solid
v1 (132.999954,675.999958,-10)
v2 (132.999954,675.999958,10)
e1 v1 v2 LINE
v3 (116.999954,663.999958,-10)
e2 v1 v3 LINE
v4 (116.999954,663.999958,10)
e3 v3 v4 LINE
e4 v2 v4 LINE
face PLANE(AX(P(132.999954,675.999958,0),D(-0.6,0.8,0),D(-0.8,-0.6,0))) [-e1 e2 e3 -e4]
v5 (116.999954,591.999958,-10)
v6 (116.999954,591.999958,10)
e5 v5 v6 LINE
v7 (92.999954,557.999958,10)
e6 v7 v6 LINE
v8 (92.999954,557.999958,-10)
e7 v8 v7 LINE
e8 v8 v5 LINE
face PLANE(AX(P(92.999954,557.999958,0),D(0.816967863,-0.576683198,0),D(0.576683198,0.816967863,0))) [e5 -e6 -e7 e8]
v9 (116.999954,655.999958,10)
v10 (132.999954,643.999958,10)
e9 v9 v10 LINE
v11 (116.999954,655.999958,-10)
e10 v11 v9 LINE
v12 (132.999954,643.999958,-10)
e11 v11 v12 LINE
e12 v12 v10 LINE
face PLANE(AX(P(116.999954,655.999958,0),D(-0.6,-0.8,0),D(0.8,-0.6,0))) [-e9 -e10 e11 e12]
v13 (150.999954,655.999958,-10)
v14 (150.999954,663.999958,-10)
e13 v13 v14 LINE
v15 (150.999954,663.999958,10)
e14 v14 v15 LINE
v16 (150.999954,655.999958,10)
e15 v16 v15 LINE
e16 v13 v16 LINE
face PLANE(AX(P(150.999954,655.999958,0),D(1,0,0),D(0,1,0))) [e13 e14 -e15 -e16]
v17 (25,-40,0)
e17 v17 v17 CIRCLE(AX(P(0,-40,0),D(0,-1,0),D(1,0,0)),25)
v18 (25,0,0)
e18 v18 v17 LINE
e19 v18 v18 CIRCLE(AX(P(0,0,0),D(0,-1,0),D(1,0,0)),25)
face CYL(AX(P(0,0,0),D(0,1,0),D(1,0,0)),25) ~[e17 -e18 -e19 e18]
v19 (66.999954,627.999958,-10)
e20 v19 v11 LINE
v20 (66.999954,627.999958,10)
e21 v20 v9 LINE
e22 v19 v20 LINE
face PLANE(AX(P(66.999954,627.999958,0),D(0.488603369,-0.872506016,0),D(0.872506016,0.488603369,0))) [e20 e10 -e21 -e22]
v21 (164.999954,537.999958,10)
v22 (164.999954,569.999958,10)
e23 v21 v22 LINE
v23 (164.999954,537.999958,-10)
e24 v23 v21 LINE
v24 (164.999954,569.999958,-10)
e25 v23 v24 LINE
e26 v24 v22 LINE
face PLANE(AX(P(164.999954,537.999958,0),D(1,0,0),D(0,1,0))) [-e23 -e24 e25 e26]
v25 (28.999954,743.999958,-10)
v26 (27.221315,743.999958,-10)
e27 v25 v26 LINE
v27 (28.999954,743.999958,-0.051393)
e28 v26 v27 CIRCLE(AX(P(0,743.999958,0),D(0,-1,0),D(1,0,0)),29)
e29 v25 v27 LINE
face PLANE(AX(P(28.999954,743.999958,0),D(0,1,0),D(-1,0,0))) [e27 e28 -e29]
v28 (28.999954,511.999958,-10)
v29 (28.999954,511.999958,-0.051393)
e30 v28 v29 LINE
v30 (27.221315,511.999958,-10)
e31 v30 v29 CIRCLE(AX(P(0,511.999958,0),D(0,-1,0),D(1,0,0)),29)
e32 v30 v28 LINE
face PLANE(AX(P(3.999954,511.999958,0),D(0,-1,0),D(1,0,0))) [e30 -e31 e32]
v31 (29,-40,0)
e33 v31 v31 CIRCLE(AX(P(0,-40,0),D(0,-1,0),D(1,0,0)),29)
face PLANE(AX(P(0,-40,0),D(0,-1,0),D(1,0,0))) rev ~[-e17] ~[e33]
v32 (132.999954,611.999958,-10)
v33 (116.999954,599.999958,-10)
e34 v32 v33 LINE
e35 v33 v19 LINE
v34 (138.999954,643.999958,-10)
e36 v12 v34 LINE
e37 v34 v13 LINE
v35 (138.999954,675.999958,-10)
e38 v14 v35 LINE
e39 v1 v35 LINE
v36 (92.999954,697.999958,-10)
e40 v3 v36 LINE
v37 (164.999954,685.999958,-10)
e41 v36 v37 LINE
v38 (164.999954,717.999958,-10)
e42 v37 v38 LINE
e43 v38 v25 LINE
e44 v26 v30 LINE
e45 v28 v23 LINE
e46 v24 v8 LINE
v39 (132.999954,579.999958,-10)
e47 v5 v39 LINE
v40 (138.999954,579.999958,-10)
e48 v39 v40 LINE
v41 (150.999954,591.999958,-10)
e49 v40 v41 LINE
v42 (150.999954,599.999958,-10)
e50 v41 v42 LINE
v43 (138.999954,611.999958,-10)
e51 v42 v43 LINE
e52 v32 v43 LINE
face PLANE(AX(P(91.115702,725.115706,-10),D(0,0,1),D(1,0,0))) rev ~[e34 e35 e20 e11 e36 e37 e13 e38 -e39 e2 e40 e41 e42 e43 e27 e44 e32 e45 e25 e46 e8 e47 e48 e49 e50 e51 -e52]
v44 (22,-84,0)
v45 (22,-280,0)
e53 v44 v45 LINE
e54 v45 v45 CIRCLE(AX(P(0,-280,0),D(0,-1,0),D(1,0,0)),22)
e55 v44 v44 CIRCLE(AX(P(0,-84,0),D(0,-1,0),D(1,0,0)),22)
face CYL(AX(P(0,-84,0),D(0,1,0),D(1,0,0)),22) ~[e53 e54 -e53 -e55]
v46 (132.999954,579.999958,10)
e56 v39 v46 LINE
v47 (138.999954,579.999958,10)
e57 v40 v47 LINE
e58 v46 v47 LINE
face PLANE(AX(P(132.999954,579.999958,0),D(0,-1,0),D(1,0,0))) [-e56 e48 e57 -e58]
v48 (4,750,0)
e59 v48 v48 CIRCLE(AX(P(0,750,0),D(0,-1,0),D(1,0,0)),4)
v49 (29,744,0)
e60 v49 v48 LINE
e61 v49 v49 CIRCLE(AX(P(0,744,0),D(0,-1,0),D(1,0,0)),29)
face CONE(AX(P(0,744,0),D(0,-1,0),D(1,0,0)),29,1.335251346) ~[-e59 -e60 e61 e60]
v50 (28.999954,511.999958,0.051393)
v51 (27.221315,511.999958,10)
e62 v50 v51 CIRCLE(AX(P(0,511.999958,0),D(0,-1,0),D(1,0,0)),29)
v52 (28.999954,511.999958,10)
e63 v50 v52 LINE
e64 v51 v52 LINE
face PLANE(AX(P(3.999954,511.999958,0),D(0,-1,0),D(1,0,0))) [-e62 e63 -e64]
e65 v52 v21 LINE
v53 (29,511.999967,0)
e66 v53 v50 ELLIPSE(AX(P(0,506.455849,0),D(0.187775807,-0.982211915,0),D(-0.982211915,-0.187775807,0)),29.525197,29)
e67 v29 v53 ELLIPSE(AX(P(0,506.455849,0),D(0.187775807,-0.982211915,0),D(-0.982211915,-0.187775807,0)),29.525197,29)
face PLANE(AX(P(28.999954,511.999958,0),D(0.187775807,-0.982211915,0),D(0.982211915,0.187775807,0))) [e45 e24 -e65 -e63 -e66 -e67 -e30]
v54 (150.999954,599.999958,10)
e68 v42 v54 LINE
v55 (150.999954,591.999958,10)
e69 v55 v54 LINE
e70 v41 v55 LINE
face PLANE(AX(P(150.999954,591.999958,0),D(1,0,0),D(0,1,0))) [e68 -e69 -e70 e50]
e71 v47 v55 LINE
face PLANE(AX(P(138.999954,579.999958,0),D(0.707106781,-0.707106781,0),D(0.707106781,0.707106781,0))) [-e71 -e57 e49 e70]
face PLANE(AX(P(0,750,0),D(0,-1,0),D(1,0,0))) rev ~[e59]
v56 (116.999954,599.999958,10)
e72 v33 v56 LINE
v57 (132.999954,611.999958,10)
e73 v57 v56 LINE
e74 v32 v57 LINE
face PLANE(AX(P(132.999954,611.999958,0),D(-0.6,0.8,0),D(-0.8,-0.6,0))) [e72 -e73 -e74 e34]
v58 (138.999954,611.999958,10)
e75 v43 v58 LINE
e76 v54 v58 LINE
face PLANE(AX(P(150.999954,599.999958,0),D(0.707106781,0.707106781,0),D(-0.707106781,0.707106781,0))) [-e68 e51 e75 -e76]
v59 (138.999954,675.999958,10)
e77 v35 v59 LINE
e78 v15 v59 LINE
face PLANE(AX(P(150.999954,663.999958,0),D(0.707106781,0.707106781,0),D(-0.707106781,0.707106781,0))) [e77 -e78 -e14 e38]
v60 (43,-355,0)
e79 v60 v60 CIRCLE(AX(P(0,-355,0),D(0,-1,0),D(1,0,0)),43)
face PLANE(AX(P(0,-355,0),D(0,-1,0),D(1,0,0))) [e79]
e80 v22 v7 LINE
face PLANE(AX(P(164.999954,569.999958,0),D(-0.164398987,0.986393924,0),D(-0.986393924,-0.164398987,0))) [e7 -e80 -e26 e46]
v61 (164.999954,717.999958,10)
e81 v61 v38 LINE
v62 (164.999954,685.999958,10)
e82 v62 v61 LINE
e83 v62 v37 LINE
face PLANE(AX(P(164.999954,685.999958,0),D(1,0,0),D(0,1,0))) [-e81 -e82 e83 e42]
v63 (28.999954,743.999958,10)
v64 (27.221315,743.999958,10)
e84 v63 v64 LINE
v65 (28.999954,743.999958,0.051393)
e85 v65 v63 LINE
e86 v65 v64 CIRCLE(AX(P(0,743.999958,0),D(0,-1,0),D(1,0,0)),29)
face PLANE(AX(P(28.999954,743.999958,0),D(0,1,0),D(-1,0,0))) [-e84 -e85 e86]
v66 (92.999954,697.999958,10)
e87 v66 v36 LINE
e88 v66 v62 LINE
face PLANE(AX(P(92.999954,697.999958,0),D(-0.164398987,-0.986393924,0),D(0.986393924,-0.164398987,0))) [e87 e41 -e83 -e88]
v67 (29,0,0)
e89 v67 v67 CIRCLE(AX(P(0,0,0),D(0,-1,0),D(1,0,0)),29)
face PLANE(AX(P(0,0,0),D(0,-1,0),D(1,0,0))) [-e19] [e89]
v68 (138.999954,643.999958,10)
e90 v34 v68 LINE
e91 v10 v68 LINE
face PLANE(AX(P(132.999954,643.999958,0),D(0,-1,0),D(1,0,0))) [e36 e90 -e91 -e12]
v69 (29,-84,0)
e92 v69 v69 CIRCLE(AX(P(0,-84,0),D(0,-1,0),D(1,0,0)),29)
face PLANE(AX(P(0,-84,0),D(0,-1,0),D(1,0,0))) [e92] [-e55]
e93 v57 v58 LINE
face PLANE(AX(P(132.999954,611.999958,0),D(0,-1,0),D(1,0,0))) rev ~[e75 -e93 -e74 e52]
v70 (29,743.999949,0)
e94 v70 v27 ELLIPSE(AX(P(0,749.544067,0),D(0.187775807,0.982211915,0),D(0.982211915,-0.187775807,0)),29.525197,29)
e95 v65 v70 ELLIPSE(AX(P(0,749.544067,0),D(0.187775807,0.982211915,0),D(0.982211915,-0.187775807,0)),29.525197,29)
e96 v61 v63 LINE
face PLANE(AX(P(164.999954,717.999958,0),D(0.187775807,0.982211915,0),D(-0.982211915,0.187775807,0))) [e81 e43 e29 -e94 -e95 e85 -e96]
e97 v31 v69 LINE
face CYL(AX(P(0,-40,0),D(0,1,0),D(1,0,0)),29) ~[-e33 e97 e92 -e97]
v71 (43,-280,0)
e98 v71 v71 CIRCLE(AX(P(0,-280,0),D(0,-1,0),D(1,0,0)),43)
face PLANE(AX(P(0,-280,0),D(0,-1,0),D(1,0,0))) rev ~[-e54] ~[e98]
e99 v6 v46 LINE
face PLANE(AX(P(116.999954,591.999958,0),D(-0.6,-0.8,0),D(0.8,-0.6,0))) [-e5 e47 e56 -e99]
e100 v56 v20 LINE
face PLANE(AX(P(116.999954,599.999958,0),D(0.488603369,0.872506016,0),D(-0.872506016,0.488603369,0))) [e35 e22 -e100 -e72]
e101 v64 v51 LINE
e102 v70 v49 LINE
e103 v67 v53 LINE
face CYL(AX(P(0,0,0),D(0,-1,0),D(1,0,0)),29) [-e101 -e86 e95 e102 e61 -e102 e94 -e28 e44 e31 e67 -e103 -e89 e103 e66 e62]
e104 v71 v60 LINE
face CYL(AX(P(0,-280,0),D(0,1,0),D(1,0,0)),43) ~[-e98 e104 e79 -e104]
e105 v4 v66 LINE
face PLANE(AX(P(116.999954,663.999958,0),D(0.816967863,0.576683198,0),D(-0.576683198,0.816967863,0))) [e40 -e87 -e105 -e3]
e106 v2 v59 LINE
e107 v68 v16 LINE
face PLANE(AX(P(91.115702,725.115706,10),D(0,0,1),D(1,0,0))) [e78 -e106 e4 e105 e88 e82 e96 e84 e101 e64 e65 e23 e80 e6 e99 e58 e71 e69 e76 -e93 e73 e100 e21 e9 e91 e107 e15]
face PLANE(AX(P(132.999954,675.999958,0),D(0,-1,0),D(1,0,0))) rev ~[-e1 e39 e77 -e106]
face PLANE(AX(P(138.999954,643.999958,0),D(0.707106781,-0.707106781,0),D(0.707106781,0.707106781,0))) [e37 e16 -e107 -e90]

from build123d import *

# Parameters (mm, degrees)
F0_R      = 29
F1_DEPTH  = 750
F2_R      = 25
F3_DEPTH  = 40
F4_R      = 29
F4_R_2    = 25
F5_DEPTH  = 44
F6_R      = 22
F7_DEPTH  = 196
F8_R      = 43
F8_R_2    = 22
F9_DEPTH  = 75
F10_SIZE2 = 25
F10_SIZE  = 6
F11_W     = 6
F11_H     = 12
F12_DEPTH = 10


# Not quite as in the source:
# - a feature names something its author has since deleted; it is built from what else it names


with BuildPart() as f1:
    # F0 (on Front) → F1 (new body)
    with BuildSketch(Plane.XZ):
        Circle(F0_R)
    extrude(amount=-F1_DEPTH)

    # F2 (on Front) → F3 (join)
    with BuildSketch(Plane.XZ):
        Circle(F2_R)
    extrude(amount=F3_DEPTH)

    # F4 (on face) → F5 (join)
    with BuildSketch(Plane.XZ.offset(40)):
        Circle(F4_R)
        Circle(F4_R_2, mode=Mode.SUBTRACT)
        Circle(F4_R_2)
    extrude(amount=F5_DEPTH)

    # F6 (on face) → F7 (join)
    with BuildSketch(Plane.XZ.offset(84)):
        Circle(F6_R)
    extrude(amount=F7_DEPTH)

    # F8 (on face) → F9 (join)
    with BuildSketch(Plane.XZ.offset(280)):
        Circle(F8_R)
        Circle(F8_R_2, mode=Mode.SUBTRACT)
        Circle(F8_R_2)
    extrude(amount=F9_DEPTH)

    # F10
    f10_edges = [f1.edges().sort_by_distance(p)[0] for p in [
        (-29, 750, 0),
    ]]
    f10_side = f1.faces().sort_by_distance((-29, 375, 0))[0]
    chamfer(f10_edges, length=F10_SIZE, length2=F10_SIZE2, reference=f10_side)

    # F11 (on Top) → F12 (join, symmetric)
    with BuildSketch(Plane.XY):
        Polygon((164.9999544621, 717.9999580383), (28.9999544621, 743.9999580383), (28.9999544621, 717.9999580383), align=None)
        Polygon((28.9999544621, 717.9999580383), (28.9999544621, 743.9999580383), (3.9999544621, 743.9999580383), (3.9999544621, 511.9999580383), (28.9999544621, 511.9999580383), (28.9999544621, 537.9999580383), align=None)
        Polygon((164.9999544621, 717.9999580383), (28.9999544621, 717.9999580383), (28.9999544621, 537.9999580383), (164.9999544621, 537.9999580383), (164.9999544621, 557.9999580383), (92.9999544621, 557.9999580383), (92.9999544621, 591.9999580383), (66.9999544621, 591.9999580383), (66.9999544621, 599.9999580383), (66.9999544621, 627.9999580383), (66.9999544621, 655.9999580383), (92.9999544621, 655.9999580383), (92.9999544621, 663.9999580383), (92.9999544621, 697.9999580383), (164.9999544621, 697.9999580383), align=None)
        Polygon((164.9999544621, 537.9999580383), (28.9999544621, 537.9999580383), (28.9999544621, 511.9999580383), align=None)
        Polygon((164.9999544621, 685.9999580383), (164.9999544621, 697.9999580383), (92.9999544621, 697.9999580383), align=None)
        Polygon((116.9999544621, 663.9999580383), (92.9999544621, 697.9999580383), (92.9999544621, 663.9999580383), align=None)
        Polygon((92.9999544621, 557.9999580383), (164.9999544621, 557.9999580383), (164.9999544621, 569.9999580383), align=None)
        Polygon((116.9999544621, 663.9999580383), (92.9999544621, 663.9999580383), (92.9999544621, 655.9999580383), (116.9999544621, 655.9999580383), (132.9999544621, 655.9999580383), (138.9999544621, 655.9999580383), (150.9999544621, 655.9999580383), (150.9999544621, 663.9999580383), (138.9999544621, 663.9999580383), (132.9999544621, 663.9999580383), align=None)
        Polygon((132.9999544621, 675.9999580383), (116.9999544621, 663.9999580383), (132.9999544621, 663.9999580383), align=None)
        Polygon((92.9999544621, 591.9999580383), (92.9999544621, 557.9999580383), (116.9999544621, 591.9999580383), align=None)
        Polygon((116.9999544621, 655.9999580383), (92.9999544621, 655.9999580383), (66.9999544621, 655.9999580383), (66.9999544621, 627.9999580383), align=None)
        with Locations((135.9999544621, 669.9999580383)):
            Rectangle(F11_W, F11_H)
        Polygon((66.9999544621, 591.9999580383), (92.9999544621, 591.9999580383), (116.9999544621, 591.9999580383), (132.9999544621, 591.9999580383), (138.9999544621, 591.9999580383), (150.9999544621, 591.9999580383), (150.9999544621, 599.9999580383), (138.9999544621, 599.9999580383), (132.9999544621, 599.9999580383), (116.9999544621, 599.9999580383), (66.9999544621, 599.9999580383), align=None)
        Polygon((132.9999544621, 591.9999580383), (116.9999544621, 591.9999580383), (132.9999544621, 579.9999580383), align=None)
        Polygon((132.9999544621, 655.9999580383), (116.9999544621, 655.9999580383), (132.9999544621, 643.9999580383), align=None)
        Polygon((138.9999544621, 675.9999580383), (138.9999544621, 663.9999580383), (150.9999544621, 663.9999580383), align=None)
        with Locations((135.9999544621, 585.9999580383)):
            Rectangle(F11_W, F11_H)
        with Locations((135.9999544621, 649.9999580383)):
            Rectangle(F11_W, F11_H)
        Polygon((116.9999544621, 599.9999580383), (66.9999544621, 627.9999580383), (66.9999544621, 599.9999580383), align=None)
        Polygon((150.9999544621, 591.9999580383), (138.9999544621, 591.9999580383), (138.9999544621, 579.9999580383), align=None)
        Polygon((150.9999544621, 655.9999580383), (138.9999544621, 655.9999580383), (138.9999544621, 643.9999580383), align=None)
        Polygon((132.9999544621, 611.9999580383), (116.9999544621, 599.9999580383), (132.9999544621, 599.9999580383), align=None)
        with Locations((135.9999544621, 605.9999580383)):
            Rectangle(F11_W, F11_H)
        Polygon((138.9999544621, 599.9999580383), (150.9999544621, 599.9999580383), (138.9999544621, 611.9999580383), align=None)
    extrude(amount=F12_DEPTH, both=True)


solid = f1.part
